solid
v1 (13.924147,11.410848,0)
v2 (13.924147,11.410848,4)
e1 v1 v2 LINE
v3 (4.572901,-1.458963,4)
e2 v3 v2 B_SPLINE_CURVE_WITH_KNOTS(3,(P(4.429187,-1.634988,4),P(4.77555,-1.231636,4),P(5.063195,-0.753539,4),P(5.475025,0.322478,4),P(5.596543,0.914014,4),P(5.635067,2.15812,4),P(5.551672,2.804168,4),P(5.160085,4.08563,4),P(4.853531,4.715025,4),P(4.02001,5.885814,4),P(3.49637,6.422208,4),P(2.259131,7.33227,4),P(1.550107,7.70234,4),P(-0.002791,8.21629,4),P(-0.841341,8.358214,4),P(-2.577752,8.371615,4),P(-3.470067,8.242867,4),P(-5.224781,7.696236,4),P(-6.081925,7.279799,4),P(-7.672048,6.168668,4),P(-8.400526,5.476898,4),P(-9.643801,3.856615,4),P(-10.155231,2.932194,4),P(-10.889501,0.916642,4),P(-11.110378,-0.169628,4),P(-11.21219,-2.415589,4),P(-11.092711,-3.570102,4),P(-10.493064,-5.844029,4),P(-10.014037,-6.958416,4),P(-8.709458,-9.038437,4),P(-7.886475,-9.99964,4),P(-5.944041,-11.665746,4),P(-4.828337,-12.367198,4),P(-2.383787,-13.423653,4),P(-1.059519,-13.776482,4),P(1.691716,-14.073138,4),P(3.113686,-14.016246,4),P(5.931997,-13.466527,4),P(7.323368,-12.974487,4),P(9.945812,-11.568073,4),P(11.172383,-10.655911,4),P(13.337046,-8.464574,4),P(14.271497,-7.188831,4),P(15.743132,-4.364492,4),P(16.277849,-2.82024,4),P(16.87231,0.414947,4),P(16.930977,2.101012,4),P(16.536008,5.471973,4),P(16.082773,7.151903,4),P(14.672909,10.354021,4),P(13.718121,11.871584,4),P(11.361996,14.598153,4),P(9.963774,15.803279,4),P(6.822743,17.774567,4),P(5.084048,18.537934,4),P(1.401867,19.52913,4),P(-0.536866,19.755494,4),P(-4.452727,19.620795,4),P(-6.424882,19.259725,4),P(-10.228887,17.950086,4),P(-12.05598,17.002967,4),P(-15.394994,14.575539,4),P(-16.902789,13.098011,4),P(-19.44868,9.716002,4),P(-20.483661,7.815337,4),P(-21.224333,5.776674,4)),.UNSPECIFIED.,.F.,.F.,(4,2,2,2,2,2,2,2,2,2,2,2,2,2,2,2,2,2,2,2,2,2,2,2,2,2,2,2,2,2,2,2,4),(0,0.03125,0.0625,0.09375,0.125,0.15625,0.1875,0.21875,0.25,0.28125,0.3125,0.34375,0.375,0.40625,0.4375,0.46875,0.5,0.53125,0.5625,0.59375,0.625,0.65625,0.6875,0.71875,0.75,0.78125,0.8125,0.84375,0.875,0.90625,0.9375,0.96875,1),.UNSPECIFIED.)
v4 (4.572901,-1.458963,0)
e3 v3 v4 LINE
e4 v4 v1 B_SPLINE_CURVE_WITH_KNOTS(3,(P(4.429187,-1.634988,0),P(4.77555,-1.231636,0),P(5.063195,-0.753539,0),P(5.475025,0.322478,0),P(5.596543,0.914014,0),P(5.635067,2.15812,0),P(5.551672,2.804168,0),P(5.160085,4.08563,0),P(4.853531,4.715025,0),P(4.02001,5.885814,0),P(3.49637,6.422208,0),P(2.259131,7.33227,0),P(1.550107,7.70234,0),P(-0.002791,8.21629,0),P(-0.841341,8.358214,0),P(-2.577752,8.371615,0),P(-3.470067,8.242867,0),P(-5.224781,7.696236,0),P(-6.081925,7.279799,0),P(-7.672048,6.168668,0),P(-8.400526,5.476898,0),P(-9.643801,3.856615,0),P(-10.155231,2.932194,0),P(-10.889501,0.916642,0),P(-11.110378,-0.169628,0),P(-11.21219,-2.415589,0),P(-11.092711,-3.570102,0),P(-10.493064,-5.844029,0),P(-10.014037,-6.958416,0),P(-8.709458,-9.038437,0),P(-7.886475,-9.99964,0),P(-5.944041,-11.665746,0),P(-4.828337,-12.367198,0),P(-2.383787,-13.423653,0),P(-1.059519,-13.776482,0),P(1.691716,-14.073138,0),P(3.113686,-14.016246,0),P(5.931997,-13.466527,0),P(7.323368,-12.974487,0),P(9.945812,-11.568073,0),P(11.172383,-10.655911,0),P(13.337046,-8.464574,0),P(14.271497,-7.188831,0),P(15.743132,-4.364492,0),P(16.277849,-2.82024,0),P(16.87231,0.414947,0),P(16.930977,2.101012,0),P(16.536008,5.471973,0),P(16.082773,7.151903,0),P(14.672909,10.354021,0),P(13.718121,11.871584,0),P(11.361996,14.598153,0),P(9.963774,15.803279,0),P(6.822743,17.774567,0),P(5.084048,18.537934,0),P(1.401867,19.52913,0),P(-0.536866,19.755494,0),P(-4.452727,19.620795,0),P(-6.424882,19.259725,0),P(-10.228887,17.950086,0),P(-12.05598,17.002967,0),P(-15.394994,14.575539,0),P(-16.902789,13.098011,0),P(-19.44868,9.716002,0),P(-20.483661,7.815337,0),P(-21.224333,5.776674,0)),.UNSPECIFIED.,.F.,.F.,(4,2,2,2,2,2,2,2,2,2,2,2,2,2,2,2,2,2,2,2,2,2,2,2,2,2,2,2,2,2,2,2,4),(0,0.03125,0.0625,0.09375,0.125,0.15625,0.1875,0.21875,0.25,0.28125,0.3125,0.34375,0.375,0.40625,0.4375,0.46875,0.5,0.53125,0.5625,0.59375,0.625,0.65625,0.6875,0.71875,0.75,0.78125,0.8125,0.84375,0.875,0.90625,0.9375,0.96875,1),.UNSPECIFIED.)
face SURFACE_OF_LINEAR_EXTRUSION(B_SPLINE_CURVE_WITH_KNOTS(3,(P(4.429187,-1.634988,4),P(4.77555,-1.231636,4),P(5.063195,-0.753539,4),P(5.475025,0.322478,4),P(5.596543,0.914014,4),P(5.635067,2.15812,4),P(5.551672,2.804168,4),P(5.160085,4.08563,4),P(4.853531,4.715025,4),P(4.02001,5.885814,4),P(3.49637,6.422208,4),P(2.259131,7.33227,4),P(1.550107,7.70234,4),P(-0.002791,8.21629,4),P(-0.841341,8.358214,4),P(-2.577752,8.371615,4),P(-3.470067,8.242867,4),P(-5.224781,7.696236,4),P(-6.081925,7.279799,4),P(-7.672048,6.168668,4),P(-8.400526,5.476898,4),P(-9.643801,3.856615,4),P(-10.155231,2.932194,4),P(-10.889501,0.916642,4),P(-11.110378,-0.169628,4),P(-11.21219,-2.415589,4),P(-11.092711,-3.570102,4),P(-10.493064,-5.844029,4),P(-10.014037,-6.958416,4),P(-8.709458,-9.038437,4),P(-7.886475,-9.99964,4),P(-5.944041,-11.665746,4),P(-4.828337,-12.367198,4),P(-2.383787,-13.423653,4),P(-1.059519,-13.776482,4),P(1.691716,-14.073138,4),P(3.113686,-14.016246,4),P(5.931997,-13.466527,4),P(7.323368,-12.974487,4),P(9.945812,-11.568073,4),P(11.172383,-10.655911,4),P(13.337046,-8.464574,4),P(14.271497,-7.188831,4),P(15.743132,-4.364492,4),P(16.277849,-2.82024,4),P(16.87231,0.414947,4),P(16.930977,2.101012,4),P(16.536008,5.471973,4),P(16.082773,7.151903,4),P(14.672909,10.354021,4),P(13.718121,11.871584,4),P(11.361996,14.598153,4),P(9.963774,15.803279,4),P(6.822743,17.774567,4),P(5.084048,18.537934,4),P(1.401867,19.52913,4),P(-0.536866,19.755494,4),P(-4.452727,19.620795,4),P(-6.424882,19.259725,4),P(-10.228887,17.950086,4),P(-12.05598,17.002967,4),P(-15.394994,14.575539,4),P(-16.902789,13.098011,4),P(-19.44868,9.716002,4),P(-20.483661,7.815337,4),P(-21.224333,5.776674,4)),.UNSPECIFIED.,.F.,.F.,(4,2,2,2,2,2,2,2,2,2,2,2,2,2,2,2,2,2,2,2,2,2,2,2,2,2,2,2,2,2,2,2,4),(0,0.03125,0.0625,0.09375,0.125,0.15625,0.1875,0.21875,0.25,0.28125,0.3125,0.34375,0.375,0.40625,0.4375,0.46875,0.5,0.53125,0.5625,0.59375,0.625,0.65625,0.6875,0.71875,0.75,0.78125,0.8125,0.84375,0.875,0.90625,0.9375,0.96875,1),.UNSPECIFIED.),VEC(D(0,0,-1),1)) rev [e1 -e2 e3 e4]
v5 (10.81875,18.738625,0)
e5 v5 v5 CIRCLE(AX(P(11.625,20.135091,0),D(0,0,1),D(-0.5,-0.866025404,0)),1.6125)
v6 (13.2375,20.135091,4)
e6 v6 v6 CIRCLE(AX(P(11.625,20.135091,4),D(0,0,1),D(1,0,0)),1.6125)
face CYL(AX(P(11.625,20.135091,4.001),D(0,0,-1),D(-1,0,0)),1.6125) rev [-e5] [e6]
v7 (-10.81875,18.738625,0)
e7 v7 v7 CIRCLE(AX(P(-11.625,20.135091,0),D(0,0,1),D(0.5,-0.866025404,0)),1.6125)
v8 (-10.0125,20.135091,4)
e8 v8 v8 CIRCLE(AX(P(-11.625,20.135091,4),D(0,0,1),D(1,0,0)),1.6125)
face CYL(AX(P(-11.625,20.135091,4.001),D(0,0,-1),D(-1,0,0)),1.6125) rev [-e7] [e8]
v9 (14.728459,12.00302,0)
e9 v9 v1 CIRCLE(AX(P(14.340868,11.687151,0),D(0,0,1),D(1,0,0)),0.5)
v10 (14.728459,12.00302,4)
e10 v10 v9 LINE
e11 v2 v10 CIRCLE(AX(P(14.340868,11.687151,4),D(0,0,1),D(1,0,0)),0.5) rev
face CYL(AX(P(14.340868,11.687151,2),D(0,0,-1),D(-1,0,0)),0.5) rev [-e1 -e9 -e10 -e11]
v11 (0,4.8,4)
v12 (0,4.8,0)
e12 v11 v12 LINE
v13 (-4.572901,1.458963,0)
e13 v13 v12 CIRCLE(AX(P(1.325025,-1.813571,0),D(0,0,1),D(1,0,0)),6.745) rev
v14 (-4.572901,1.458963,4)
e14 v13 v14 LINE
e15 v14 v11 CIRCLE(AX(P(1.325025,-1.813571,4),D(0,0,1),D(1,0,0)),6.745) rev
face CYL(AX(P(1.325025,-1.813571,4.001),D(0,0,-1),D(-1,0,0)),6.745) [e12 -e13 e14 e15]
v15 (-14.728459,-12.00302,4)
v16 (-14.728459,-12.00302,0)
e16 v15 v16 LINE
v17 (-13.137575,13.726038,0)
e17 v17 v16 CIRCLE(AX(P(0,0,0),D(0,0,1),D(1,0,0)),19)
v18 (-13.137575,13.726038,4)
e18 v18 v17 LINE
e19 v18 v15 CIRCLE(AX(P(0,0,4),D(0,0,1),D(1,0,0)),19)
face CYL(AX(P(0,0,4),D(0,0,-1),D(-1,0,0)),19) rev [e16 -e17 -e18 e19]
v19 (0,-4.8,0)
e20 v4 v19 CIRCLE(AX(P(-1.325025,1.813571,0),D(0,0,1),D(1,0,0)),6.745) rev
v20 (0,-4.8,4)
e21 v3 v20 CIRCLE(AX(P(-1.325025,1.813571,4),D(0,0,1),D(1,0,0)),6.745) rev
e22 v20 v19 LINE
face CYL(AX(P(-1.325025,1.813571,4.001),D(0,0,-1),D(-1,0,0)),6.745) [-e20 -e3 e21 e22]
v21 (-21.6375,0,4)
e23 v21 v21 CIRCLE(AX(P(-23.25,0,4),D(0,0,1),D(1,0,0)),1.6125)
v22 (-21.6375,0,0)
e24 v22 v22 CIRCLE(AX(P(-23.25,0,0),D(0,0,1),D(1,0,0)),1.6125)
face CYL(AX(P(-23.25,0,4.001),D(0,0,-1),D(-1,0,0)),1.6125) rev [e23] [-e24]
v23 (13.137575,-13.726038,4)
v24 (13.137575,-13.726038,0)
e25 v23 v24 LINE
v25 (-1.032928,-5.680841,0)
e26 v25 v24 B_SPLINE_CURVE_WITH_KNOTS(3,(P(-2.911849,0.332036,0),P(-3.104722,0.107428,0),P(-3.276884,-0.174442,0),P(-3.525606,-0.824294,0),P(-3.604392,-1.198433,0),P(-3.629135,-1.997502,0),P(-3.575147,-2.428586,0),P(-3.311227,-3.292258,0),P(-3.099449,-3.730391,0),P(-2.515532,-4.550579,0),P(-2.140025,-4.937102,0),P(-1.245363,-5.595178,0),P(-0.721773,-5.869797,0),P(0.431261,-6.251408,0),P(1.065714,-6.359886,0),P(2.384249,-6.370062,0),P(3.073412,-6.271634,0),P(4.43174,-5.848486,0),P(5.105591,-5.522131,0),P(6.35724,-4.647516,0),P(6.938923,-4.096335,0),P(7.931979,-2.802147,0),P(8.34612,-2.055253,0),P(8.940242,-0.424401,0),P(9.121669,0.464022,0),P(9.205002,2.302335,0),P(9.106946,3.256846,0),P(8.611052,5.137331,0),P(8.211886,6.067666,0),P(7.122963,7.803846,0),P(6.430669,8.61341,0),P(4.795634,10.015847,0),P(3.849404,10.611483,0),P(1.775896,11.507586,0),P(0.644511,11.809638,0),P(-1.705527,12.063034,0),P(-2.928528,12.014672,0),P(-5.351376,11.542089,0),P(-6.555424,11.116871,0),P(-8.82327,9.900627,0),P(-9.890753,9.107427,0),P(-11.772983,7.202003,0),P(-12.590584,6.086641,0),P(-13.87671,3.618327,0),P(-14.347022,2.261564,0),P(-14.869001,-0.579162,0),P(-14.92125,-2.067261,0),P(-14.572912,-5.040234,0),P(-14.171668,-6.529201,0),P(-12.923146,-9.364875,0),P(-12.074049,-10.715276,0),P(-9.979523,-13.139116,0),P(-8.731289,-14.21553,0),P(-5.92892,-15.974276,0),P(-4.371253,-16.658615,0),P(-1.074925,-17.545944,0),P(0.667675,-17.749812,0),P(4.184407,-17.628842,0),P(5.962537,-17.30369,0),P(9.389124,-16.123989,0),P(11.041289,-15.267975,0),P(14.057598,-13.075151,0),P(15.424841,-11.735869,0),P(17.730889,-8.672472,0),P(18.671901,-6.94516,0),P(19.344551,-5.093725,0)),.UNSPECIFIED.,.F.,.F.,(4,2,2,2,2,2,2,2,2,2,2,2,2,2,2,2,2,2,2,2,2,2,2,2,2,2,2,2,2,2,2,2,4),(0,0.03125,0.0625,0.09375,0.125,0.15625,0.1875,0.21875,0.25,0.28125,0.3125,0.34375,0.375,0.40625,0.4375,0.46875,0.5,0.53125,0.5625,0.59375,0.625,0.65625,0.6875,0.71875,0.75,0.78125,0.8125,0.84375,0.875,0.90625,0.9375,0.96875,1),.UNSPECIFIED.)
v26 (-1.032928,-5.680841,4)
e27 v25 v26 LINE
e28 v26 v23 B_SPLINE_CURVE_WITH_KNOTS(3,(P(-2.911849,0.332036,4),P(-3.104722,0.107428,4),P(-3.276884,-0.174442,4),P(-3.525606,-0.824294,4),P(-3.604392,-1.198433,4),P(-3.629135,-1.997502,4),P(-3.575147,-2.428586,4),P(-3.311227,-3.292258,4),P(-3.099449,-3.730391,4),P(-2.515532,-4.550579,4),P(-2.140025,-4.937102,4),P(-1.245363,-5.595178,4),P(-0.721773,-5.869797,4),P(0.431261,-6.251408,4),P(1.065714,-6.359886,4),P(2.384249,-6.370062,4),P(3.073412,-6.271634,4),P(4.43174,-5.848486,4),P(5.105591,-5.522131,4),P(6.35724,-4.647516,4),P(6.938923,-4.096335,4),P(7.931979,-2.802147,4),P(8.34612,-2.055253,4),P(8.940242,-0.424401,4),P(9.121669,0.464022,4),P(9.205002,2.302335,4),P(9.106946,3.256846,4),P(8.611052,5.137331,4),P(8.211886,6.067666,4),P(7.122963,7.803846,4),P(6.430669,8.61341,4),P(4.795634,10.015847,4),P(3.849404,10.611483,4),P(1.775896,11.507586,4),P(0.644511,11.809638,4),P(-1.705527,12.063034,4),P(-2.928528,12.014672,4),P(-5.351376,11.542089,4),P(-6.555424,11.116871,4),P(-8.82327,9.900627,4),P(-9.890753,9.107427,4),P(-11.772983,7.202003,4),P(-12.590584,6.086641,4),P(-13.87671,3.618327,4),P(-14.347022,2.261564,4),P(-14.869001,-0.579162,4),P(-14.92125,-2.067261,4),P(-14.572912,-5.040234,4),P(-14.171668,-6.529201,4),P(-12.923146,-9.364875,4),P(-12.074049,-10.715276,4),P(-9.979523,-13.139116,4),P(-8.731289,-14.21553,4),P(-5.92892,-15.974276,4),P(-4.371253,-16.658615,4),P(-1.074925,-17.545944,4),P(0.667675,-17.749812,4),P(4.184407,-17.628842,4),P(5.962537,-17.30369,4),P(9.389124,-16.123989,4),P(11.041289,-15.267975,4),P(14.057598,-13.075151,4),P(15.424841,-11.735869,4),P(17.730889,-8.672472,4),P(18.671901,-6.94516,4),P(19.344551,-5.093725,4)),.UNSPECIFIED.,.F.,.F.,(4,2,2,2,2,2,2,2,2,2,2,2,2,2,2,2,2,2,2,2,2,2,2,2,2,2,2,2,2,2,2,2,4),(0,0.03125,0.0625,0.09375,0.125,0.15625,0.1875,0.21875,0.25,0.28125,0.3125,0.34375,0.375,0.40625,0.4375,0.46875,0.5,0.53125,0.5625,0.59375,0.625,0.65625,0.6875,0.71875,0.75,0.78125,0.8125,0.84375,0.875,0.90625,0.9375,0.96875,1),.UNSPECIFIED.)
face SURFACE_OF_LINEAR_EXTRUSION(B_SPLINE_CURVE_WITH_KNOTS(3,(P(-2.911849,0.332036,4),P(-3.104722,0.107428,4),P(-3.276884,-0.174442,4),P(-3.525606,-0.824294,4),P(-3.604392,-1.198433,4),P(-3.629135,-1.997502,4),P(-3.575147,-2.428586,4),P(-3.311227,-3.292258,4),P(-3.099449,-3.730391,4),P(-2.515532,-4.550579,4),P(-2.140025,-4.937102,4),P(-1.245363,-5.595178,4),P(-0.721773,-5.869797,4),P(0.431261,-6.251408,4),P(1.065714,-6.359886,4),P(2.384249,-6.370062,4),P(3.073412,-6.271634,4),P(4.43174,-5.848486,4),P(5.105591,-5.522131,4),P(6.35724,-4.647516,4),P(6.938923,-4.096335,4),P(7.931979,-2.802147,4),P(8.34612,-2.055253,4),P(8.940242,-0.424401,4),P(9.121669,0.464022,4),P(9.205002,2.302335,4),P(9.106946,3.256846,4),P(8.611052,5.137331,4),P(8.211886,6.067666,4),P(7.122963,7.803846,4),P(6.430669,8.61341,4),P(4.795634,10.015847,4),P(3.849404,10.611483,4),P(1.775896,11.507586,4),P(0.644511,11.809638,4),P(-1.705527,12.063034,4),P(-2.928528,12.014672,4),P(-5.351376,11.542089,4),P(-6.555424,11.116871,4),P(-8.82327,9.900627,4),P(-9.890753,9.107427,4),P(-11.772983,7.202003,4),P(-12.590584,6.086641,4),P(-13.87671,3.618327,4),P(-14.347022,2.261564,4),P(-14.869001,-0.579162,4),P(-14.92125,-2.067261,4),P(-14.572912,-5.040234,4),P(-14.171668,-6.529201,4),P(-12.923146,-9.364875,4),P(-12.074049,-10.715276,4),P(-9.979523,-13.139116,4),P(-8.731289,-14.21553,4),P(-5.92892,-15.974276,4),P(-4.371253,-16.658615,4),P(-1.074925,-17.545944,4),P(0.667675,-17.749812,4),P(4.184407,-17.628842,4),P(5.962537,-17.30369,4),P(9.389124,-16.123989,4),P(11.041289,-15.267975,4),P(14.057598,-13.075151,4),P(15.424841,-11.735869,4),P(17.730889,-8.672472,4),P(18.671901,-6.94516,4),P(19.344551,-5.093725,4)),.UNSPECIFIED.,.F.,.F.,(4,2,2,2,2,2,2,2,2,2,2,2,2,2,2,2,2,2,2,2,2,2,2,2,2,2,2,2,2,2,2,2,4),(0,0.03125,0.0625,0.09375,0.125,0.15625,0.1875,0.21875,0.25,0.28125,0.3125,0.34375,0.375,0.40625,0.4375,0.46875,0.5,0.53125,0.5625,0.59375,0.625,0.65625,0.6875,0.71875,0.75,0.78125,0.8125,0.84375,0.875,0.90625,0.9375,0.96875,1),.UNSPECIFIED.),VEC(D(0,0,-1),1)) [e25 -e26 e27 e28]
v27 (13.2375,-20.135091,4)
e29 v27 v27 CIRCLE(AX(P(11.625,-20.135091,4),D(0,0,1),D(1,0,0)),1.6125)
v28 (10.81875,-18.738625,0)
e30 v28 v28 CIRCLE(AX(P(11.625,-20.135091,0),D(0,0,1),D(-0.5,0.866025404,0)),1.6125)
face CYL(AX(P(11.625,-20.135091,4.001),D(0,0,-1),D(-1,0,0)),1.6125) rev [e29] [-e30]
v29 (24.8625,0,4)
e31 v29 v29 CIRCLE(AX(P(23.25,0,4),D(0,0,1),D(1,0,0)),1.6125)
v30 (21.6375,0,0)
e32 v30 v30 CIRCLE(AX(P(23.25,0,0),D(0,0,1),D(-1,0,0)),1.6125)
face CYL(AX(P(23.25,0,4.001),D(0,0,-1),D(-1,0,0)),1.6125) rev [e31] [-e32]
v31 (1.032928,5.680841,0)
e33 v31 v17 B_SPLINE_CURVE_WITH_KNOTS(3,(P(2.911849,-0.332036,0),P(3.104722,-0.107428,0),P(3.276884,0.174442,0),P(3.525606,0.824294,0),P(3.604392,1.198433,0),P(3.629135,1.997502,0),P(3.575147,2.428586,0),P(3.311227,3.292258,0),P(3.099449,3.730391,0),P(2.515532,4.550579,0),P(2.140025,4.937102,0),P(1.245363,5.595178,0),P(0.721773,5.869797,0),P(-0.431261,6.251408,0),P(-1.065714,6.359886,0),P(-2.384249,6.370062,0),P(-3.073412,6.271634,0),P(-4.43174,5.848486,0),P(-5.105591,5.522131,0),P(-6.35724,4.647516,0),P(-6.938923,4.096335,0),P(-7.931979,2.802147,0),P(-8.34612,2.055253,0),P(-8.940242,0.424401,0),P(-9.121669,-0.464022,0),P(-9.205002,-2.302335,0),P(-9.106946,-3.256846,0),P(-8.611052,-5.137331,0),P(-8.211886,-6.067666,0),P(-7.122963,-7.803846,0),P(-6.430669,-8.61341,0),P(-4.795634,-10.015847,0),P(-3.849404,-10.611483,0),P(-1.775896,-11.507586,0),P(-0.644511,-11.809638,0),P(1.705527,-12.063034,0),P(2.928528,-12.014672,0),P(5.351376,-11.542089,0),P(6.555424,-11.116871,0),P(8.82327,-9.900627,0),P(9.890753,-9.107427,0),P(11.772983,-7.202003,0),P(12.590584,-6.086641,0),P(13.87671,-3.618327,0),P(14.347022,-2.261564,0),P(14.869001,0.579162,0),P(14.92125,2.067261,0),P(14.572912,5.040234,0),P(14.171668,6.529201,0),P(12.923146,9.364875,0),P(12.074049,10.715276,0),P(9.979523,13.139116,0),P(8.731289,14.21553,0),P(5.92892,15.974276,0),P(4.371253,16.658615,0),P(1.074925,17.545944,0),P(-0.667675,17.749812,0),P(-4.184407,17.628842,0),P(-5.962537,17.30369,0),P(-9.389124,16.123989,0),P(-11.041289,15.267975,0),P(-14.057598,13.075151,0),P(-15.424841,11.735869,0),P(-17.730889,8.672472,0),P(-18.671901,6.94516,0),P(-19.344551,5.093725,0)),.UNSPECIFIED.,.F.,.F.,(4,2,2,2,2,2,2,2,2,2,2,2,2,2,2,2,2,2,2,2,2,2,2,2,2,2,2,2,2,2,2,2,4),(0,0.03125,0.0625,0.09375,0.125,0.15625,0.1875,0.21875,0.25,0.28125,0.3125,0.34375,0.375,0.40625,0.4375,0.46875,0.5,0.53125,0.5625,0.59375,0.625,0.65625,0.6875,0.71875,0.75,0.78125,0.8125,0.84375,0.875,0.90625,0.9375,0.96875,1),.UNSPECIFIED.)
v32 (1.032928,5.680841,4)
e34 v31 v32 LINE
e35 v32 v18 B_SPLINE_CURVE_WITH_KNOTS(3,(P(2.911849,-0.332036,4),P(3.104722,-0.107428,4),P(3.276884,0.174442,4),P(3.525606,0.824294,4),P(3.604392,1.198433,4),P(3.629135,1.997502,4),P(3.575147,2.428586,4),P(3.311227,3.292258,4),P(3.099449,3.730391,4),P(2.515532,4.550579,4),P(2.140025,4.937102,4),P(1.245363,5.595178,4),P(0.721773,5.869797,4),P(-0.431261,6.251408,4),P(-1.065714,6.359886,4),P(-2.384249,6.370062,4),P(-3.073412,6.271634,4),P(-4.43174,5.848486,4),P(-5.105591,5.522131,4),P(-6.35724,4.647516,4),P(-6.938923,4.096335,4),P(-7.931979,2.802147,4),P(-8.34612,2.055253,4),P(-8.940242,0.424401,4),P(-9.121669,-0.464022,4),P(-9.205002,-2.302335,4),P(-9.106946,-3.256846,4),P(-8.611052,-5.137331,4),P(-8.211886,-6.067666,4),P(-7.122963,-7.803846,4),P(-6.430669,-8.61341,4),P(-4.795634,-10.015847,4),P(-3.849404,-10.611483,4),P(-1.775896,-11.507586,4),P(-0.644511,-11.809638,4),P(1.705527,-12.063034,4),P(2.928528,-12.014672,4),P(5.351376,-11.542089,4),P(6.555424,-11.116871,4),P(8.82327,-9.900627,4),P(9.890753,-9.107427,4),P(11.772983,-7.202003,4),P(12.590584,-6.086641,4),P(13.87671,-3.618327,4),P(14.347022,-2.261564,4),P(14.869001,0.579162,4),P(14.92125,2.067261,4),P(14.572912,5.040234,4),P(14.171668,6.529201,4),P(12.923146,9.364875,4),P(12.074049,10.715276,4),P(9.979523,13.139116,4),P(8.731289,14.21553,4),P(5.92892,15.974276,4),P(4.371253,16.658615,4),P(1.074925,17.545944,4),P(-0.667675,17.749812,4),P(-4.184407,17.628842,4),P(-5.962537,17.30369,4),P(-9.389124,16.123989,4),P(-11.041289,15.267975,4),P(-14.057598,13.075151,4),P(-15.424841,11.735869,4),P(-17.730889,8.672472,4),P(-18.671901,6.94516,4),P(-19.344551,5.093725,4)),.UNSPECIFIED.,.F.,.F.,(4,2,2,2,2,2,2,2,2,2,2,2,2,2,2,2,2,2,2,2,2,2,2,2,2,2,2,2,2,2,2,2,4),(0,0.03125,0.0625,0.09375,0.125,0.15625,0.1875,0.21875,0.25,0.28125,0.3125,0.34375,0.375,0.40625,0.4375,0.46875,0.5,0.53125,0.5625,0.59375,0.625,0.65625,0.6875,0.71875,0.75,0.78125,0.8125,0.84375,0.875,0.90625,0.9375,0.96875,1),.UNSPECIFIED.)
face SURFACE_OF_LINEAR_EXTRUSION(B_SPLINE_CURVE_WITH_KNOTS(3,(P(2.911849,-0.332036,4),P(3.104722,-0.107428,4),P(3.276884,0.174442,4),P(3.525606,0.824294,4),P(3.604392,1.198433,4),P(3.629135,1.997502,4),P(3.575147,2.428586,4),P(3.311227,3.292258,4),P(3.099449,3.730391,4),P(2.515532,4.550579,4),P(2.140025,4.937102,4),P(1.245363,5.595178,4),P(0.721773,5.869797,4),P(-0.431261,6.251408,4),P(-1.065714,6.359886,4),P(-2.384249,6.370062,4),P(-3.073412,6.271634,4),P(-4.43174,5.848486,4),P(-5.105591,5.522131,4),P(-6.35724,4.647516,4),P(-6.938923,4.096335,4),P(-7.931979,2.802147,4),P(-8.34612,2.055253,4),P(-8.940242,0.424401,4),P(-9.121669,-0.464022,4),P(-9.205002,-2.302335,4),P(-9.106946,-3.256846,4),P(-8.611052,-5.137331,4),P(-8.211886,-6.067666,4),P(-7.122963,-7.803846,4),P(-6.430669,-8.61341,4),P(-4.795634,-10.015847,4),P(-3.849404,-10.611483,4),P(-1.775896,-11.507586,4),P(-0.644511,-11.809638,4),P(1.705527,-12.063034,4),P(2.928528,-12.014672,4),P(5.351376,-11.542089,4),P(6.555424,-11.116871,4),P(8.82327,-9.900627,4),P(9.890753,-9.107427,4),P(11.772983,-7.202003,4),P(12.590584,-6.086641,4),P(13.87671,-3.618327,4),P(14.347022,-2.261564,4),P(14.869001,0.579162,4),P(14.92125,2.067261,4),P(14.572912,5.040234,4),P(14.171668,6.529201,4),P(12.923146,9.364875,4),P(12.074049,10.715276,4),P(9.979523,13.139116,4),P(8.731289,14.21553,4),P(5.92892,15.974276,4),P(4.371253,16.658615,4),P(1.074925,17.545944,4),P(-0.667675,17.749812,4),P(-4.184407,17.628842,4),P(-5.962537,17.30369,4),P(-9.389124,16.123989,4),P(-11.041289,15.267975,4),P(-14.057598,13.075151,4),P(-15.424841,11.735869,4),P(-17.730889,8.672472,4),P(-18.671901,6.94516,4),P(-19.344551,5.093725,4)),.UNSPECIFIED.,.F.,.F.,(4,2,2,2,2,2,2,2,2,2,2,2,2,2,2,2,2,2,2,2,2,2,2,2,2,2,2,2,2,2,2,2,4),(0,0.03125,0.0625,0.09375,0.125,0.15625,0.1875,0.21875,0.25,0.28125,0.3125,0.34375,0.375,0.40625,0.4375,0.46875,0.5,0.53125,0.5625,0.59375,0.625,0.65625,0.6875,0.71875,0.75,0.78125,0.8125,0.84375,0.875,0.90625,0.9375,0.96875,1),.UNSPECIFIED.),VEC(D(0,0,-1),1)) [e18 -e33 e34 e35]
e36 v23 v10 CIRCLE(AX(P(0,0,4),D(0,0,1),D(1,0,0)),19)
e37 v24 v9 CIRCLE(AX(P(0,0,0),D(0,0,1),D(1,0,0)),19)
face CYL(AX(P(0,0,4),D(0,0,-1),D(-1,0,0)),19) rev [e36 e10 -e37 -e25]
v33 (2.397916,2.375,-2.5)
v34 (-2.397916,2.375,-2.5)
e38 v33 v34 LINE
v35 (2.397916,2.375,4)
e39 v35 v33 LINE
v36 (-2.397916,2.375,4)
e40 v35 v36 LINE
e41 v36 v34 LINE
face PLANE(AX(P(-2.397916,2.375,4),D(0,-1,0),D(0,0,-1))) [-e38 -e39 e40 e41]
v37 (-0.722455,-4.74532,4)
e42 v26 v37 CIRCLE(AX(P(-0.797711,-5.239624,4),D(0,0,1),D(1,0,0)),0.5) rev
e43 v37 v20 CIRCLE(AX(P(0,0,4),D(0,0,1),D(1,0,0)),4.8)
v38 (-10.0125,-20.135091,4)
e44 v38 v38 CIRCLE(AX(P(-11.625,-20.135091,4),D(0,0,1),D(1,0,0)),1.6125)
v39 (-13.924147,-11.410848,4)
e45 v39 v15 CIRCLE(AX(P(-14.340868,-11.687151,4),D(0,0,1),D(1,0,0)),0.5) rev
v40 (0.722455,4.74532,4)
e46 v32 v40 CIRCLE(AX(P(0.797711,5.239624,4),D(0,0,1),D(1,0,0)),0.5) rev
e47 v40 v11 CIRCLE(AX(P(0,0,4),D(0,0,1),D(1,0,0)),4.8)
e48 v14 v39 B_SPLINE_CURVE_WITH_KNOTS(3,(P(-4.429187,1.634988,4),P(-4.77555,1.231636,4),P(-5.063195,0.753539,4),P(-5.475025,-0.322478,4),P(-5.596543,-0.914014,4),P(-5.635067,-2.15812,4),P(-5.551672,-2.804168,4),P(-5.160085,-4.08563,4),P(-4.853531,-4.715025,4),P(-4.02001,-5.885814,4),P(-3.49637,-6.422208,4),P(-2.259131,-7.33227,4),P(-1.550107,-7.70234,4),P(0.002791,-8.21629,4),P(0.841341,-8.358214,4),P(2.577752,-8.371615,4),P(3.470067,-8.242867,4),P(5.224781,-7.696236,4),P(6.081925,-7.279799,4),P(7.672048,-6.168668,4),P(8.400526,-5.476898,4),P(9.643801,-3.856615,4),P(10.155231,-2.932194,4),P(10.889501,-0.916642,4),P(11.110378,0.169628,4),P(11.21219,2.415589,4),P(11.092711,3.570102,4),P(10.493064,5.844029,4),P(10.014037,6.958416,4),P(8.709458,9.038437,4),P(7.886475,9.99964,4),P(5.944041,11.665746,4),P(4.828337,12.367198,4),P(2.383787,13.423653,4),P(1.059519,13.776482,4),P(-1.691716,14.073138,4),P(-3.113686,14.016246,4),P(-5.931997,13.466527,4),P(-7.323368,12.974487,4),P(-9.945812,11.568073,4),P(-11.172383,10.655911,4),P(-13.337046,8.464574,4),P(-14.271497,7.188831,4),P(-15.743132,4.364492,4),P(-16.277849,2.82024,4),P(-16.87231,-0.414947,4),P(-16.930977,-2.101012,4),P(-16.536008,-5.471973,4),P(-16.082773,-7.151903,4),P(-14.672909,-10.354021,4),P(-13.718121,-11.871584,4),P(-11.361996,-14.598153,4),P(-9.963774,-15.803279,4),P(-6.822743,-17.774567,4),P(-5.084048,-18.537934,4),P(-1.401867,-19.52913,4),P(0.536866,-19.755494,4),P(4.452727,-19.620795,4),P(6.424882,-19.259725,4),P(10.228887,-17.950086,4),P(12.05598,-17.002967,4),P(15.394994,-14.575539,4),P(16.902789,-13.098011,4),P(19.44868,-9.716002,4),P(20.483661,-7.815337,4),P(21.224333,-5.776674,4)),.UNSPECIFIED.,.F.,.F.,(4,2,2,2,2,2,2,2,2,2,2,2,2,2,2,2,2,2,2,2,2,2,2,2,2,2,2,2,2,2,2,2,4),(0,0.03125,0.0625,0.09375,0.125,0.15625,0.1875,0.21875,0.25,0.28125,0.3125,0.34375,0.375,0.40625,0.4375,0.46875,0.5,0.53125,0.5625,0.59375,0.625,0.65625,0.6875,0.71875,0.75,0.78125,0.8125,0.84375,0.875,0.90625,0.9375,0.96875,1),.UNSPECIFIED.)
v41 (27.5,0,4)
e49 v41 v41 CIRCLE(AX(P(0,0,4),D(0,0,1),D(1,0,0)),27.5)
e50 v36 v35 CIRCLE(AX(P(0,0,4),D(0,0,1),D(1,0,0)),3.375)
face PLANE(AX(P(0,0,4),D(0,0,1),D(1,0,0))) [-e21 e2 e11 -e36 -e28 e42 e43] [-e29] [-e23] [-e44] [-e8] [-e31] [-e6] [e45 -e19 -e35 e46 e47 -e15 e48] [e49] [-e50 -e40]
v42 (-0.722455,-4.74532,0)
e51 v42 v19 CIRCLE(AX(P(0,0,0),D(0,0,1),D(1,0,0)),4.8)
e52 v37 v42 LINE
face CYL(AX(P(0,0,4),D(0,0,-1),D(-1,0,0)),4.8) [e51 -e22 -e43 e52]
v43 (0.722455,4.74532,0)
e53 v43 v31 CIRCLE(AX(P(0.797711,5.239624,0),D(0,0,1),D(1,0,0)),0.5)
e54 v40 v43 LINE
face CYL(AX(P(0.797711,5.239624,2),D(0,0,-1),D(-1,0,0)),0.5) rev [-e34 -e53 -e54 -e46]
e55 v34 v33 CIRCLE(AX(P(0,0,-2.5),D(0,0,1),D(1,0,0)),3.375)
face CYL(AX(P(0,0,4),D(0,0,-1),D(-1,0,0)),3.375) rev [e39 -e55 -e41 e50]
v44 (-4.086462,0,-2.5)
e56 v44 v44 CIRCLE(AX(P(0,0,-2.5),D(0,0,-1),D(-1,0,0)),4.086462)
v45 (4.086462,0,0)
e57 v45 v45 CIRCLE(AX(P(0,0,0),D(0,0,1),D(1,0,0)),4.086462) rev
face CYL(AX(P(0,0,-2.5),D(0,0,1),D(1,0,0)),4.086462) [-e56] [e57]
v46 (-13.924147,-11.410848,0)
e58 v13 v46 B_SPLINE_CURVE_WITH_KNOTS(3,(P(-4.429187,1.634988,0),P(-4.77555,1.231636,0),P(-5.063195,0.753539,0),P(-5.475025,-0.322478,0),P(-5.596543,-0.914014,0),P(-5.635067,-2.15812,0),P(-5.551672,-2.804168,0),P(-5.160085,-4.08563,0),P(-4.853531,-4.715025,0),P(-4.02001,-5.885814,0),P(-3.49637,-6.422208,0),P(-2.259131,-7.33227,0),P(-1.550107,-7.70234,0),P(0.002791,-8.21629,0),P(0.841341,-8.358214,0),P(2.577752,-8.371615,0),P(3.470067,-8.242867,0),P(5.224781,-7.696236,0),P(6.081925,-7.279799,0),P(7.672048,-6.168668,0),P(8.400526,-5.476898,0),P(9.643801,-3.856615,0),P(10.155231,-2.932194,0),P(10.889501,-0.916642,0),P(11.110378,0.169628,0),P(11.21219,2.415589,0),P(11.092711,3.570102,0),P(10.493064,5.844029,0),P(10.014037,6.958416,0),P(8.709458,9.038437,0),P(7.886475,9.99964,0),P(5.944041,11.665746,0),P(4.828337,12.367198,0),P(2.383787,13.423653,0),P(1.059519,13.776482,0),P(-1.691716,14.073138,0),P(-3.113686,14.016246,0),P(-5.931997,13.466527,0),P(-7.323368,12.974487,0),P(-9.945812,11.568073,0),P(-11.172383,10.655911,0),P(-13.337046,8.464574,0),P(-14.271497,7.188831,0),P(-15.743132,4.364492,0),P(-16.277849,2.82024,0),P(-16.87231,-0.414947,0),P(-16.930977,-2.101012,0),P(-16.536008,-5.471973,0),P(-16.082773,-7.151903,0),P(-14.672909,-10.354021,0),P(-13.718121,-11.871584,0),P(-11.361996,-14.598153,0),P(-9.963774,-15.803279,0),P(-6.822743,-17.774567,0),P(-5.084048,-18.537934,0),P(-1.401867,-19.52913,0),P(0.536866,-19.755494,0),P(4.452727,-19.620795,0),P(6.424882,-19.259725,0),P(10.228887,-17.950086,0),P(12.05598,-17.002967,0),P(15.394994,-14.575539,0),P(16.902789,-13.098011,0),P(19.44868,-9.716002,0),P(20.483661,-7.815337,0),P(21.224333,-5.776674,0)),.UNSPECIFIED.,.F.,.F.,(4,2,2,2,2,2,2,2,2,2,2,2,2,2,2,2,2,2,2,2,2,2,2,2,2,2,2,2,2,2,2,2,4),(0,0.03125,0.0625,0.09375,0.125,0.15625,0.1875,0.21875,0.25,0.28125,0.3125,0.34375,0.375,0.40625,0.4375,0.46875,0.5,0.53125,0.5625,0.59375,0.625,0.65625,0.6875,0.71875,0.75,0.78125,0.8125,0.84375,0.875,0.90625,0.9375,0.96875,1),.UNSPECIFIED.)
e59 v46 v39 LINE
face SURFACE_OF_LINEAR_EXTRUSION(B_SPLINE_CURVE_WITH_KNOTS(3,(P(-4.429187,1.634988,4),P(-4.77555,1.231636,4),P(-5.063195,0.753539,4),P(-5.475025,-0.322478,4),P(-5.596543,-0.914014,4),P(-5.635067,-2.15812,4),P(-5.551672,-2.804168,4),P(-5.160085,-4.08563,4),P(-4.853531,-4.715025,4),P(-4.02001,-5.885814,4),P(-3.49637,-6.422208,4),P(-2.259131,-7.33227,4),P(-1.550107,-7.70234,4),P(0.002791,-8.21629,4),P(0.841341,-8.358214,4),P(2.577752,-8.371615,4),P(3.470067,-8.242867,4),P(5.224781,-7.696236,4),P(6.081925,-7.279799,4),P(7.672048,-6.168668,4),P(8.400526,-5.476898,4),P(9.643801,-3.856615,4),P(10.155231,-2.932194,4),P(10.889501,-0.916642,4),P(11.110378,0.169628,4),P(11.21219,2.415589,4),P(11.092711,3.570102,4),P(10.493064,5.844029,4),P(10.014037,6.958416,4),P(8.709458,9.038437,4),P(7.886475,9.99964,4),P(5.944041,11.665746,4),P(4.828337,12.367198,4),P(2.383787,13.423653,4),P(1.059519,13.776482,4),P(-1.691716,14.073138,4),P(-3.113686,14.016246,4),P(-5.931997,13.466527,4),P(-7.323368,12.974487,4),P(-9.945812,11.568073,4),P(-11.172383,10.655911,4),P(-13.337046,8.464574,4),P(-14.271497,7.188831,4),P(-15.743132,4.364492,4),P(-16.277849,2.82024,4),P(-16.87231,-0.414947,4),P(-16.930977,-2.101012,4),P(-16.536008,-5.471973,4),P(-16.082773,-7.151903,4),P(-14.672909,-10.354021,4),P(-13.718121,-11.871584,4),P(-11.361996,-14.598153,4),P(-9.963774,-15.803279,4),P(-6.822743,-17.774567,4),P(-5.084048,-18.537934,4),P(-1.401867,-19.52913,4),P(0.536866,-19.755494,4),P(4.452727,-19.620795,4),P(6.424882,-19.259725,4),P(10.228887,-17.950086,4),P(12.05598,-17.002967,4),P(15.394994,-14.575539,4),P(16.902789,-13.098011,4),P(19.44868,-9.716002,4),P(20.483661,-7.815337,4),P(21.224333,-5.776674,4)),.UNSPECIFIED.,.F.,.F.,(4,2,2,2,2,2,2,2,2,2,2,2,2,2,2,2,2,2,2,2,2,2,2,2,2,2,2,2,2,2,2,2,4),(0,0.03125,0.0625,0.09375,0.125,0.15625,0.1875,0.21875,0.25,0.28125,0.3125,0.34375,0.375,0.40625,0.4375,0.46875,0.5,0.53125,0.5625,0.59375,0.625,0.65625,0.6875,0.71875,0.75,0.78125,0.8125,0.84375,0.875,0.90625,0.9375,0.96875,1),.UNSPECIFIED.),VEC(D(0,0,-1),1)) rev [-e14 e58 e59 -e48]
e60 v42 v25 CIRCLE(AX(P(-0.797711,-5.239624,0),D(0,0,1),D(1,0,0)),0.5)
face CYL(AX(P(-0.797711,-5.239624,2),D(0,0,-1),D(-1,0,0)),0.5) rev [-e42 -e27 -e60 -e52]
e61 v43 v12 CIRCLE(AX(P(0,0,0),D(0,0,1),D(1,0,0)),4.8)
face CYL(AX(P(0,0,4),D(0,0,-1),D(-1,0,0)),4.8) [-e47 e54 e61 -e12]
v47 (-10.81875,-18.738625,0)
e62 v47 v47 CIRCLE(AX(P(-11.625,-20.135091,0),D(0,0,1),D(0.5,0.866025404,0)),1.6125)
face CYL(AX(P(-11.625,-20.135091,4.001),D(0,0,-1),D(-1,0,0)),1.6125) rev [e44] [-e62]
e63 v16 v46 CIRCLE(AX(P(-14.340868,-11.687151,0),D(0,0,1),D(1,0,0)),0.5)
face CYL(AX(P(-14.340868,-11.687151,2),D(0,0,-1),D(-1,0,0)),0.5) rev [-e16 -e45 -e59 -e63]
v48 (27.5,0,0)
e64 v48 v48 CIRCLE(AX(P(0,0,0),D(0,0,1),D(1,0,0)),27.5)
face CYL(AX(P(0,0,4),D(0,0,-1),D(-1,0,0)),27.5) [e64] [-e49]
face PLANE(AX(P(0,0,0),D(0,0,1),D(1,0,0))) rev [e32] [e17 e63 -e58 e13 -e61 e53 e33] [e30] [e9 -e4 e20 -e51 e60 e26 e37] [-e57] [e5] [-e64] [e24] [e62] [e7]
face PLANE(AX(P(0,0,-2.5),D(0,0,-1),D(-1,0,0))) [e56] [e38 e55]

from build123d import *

# Parameters (mm, degrees)
SKETCH1_R               = 27.5
SKETCH1_R_2             = 19
BOSS_EXTRUDE1_DEPTH     = 4
SKETCH1_R_3             = 4.8
BOSS_EXTRUDE1_2_DEPTH   = 4
EXTRUDE_THIN1_DEPTH     = 4
CIRPATTERN1_COUNT       = 2
SKETCH9_R               = 4.086461839
BOSS_EXTRUDE3_DEPTH     = 2.5
CUT_EXTRUDE2_REACH      = 41.096
SKETCH4_R               = 1.6125
CIRPATTERN2_COUNT       = 6
CUT_EXTRUDE3_DEPTH      = 40.096035756
CUT_EXTRUDE3_DEPTH_BACK = 40.096035756
CUT_EXTRUDE4_REACH      = 41.096
FILLET3_R               = 0.5


# Read off the part's stored shape, not the designer's step: Extrude-Thin1
with BuildPart() as part:
    # Sketch1 → Boss-Extrude1 (new body)
    with BuildSketch(Plane.XY):
        Circle(SKETCH1_R)
        Circle(SKETCH1_R_2, mode=Mode.SUBTRACT)
    extrude(amount=BOSS_EXTRUDE1_DEPTH)



with BuildPart() as body_2:
    # Sketch1 → Boss-Extrude1 2 (new body)
    with BuildSketch(Plane.XY):
        Circle(SKETCH1_R_3)
    extrude(amount=BOSS_EXTRUDE1_2_DEPTH)


with BuildPart() as part_1:
    add(part.part)

    add(body_2.part)  # Extrude-Thin1 merges body 2
    # Extrude-Thin1 outline → Extrude-Thin1 (add)
    with BuildSketch(Plane.XY):
        with BuildLine():
            ThreePointArc((-3.108383055, -3.657588657), (-4.614683908, -1.320868061), (-4.572901435, 1.458962803))
            add(Edge.make_bspline(
                [(-4.572901435, 1.458962803), (-4.855470926, 1.094863493), (-5.092389525, 0.677260697), (-5.475025276, -0.322478427), (-5.596543423, -0.914014078), (-5.635067196, -2.158120342), (-5.551671719, -2.804167906), (-5.160084594, -4.085630128), (-4.853530663, -4.715025251), (-4.0200099, -5.885814032), (-3.496370389, -6.422208421), (-2.259130972, -7.33226996), (-1.550106751, -7.702340429), (0.002791035, -8.21629049), (0.841341497, -8.358214348), (2.577752087, -8.371615404), (3.470066966, -8.242866989), (5.224780858, -7.696235602), (6.081924908, -7.279799209), (7.672048277, -6.168668168), (8.400525963, -5.47689817), (9.643801179, -3.856614785), (10.155230949, -2.932193746), (10.889500583, -0.916641551), (11.110377635, 0.16962812), (11.212190246, 2.415588976), (11.092711016, 3.570101931), (10.493064254, 5.844028949), (10.014036565, 6.95841616), (8.70945828, 9.038437186), (7.886474683, 9.999640467), (5.94404138, 11.665745573), (4.828337395, 12.367198334), (2.383787445, 13.423653378), (1.059519353, 13.776482072), (-1.69171552, 14.073137993), (-3.113686308, 14.016246414), (-5.931997037, 13.466527309), (-7.323368358, 12.974486564), (-9.945812484, 11.568072605), (-11.172382669, 10.65591111), (-13.33704626, 8.464573846), (-14.271497339, 7.18883076), (-15.743131537, 4.364491624), (-16.277849107, 2.820240417), (-16.8723103, -0.414946557), (-16.930977159, -2.101011665), (-16.536007552, -5.47197287), (-16.082772996, -7.151902636), (-14.67290914, -10.354020842), (-13.718121061, -11.871583896), (-11.361995693, -14.598152532), (-9.96377427, -15.80327902), (-7.720924179, -17.210874909), (-7.017768014, -17.592090842), (-6.28895119, -17.929001448)],
                knots=[0.004430584, 0.004430584, 0.004430584, 0.004430584, 0.03125, 0.03125, 0.0625, 0.0625, 0.09375, 0.09375, 0.125, 0.125, 0.15625, 0.15625, 0.1875, 0.1875, 0.21875, 0.21875, 0.25, 0.25, 0.28125, 0.28125, 0.3125, 0.3125, 0.34375, 0.34375, 0.375, 0.375, 0.40625, 0.40625, 0.4375, 0.4375, 0.46875, 0.46875, 0.5, 0.5, 0.53125, 0.53125, 0.5625, 0.5625, 0.59375, 0.59375, 0.625, 0.625, 0.65625, 0.65625, 0.6875, 0.6875, 0.71875, 0.71875, 0.75, 0.75, 0.78125, 0.78125, 0.8125, 0.8125, 0.825878057, 0.825878057, 0.825878057, 0.825878057], degree=3))
            ThreePointArc((-6.28895119, -17.929001448), (4.017728037, -18.570348985), (13.137575262, -13.726037893))
            add(Edge.make_bspline(
                [(-3.108383055, -3.657588657), (-3.019895488, -3.821392552), (-2.919604892, -3.983006114), (-2.515531961, -4.550579325), (-2.140024533, -4.937102361), (-1.245362848, -5.595178057), (-0.721773312, -5.86979716), (0.431261097, -6.251407663), (1.065714485, -6.359886424), (2.384248888, -6.370062447), (3.073412475, -6.271634423), (4.431739701, -5.848486069), (5.10559086, -5.522130857), (6.357239667, -4.6475158), (6.938923257, -4.09633507), (7.931979216, -2.802146905), (8.346119598, -2.055253096), (8.940242321, -0.424400748), (9.121669049, 0.464022066), (9.205002385, 2.302334719), (9.106946428, 3.256846055), (8.611052348, 5.137331401), (8.211885769, 6.067665952), (7.122962665, 7.803846126), (6.430669449, 8.61341009), (4.795634002, 10.015847384), (3.849404179, 10.611483129), (1.775895618, 11.507586143), (0.644510808, 11.809638028), (-1.705527177, 12.063034309), (-2.928527542, 12.014671718), (-5.351376294, 11.542088538), (-6.55542387, 11.116870522), (-8.823270198, 9.90062698), (-9.890752693, 9.10742687), (-11.772982783, 7.202003342), (-12.590583821, 6.086641398), (-13.876709983, 3.61832661), (-14.347021843, 2.261564084), (-14.869001453, -0.579162367), (-14.921250008, -2.067261482), (-14.572911991, -5.040234389), (-14.171668387, -6.529201067), (-12.92314645, -9.364875454), (-12.07404949, -10.715275825), (-9.97952298, -13.13911556), (-8.731289181, -14.215529996), (-5.928919608, -15.974276114), (-4.371252873, -16.658615159), (-1.074925401, -17.545944226), (0.667674798, -17.749811563), (4.184406682, -17.628841906), (5.962537172, -17.303690302), (9.389124069, -16.123988963), (11.041289119, -15.267975167), (12.747985339, -14.027225348), (12.944084962, -13.878678599), (13.137575262, -13.726037893)],
                knots=[0.112999786, 0.112999786, 0.112999786, 0.112999786, 0.125, 0.125, 0.15625, 0.15625, 0.1875, 0.1875, 0.21875, 0.21875, 0.25, 0.25, 0.28125, 0.28125, 0.3125, 0.3125, 0.34375, 0.34375, 0.375, 0.375, 0.40625, 0.40625, 0.4375, 0.4375, 0.46875, 0.46875, 0.5, 0.5, 0.53125, 0.53125, 0.5625, 0.5625, 0.59375, 0.59375, 0.625, 0.625, 0.65625, 0.65625, 0.6875, 0.6875, 0.71875, 0.71875, 0.75, 0.75, 0.78125, 0.78125, 0.8125, 0.8125, 0.84375, 0.84375, 0.875, 0.875, 0.90625, 0.90625, 0.9375, 0.9375, 0.941613921, 0.941613921, 0.941613921, 0.941613921], degree=3))
        make_face()
    extrude_thin1 = extrude(amount=EXTRUDE_THIN1_DEPTH)

    # CirPattern1: Extrude-Thin1 ×2 about axis
    cirpattern1_axis = Axis((0, 0, 4), (0, 0, -1))
    for i in range(1, CIRPATTERN1_COUNT):
        add(extrude_thin1.rotate(cirpattern1_axis, i * 360 / CIRPATTERN1_COUNT))

    # Sketch9 → Boss-Extrude3 (add)
    with BuildSketch(Plane(origin=(0, 0, 0), x_dir=(-1, 0, 0), z_dir=(0, 0, -1))):
        with Locations(Location((0, 0, 0), (0, 0, 180))):
            Circle(SKETCH9_R)
    extrude(amount=BOSS_EXTRUDE3_DEPTH)

    # Sketch4 → Cut-Extrude2 (cut, up to next)
    with BuildSketch(Plane.XY, mode=Mode.PRIVATE) as cut_extrude2_sk1:
        with Locations((-23.25, 0)):
            Circle(SKETCH4_R)
    cut_extrude2_tool1 = extrude(cut_extrude2_sk1.sketch, amount=CUT_EXTRUDE2_REACH, mode=Mode.PRIVATE) & part_1.part
    cut_extrude2 = cut_extrude2_tool1.solids().sort_by_distance((-23.25, 0, 0))[0]
    add(cut_extrude2, mode=Mode.SUBTRACT)

    # CirPattern2: Cut-Extrude2 ×6 about axis
    cirpattern2_axis = Axis((0, 0, 0), (0, 0, 1))
    for i in range(1, CIRPATTERN2_COUNT):
        add(cut_extrude2.rotate(cirpattern2_axis, i * 360 / CIRPATTERN2_COUNT), mode=Mode.SUBTRACT)

    # Sketch6 → Cut-Extrude3 (cut, two sides: drawn at the far end of the back side and taken through both)
    with BuildSketch(Plane.XY.offset(-CUT_EXTRUDE3_DEPTH_BACK)):
        with BuildLine():
            Line((-2.397915762, 2.375), (2.397915762, 2.375))
            ThreePointArc((2.397915762, 2.375), (0, -3.375), (-2.397915762, 2.375))
        make_face()
    extrude(amount=CUT_EXTRUDE3_DEPTH + CUT_EXTRUDE3_DEPTH_BACK, mode=Mode.SUBTRACT)

    # Sketch7 → Cut-Extrude4 (cut, up to next)
    with BuildSketch(Plane.XY, mode=Mode.PRIVATE) as cut_extrude4_sk1:
        with BuildLine():
            ThreePointArc((-4.572901435, 1.458962803), (-2.831693711, 3.875759374), (0, 4.8))
            ThreePointArc((0, 4.8), (-2.654094139, 3.632677573), (-4.572901435, 1.458962803))
        make_face()
    cut_extrude4_tool1 = extrude(cut_extrude4_sk1.sketch, amount=CUT_EXTRUDE4_REACH, mode=Mode.PRIVATE) & part_1.part
    # Sketch7 → Cut-Extrude4 (cut, up to next)
    with BuildSketch(Plane.XY, mode=Mode.PRIVATE) as cut_extrude4_sk2:
        with BuildLine():
            ThreePointArc((4.572901435, -1.458962803), (2.831693711, -3.875759374), (0, -4.8))
            ThreePointArc((0, -4.8), (2.654094139, -3.632677573), (4.572901435, -1.458962803))
        make_face()
    cut_extrude4_tool2 = extrude(cut_extrude4_sk2.sketch, amount=CUT_EXTRUDE4_REACH, mode=Mode.PRIVATE) & part_1.part
    add(cut_extrude4_tool1.solids().sort_by_distance((-2.798283, 3.83003, 0))[0], mode=Mode.SUBTRACT)
    add(cut_extrude4_tool2.solids().sort_by_distance((2.798283, -3.83003, 0))[0], mode=Mode.SUBTRACT)

    # Fillet3
    fillet3_edges = [part_1.edges().sort_by_distance(p)[0] for p in [
        (-6.28895119, -17.929001448, 2),
        (-3.108383055, -3.657588657, 2),
        (3.108383055, 3.657588657, 2),
        (6.28895119, 17.929001448, 2),
    ]]
    fillet(fillet3_edges, radius=FILLET3_R)


solid = part_1.part
